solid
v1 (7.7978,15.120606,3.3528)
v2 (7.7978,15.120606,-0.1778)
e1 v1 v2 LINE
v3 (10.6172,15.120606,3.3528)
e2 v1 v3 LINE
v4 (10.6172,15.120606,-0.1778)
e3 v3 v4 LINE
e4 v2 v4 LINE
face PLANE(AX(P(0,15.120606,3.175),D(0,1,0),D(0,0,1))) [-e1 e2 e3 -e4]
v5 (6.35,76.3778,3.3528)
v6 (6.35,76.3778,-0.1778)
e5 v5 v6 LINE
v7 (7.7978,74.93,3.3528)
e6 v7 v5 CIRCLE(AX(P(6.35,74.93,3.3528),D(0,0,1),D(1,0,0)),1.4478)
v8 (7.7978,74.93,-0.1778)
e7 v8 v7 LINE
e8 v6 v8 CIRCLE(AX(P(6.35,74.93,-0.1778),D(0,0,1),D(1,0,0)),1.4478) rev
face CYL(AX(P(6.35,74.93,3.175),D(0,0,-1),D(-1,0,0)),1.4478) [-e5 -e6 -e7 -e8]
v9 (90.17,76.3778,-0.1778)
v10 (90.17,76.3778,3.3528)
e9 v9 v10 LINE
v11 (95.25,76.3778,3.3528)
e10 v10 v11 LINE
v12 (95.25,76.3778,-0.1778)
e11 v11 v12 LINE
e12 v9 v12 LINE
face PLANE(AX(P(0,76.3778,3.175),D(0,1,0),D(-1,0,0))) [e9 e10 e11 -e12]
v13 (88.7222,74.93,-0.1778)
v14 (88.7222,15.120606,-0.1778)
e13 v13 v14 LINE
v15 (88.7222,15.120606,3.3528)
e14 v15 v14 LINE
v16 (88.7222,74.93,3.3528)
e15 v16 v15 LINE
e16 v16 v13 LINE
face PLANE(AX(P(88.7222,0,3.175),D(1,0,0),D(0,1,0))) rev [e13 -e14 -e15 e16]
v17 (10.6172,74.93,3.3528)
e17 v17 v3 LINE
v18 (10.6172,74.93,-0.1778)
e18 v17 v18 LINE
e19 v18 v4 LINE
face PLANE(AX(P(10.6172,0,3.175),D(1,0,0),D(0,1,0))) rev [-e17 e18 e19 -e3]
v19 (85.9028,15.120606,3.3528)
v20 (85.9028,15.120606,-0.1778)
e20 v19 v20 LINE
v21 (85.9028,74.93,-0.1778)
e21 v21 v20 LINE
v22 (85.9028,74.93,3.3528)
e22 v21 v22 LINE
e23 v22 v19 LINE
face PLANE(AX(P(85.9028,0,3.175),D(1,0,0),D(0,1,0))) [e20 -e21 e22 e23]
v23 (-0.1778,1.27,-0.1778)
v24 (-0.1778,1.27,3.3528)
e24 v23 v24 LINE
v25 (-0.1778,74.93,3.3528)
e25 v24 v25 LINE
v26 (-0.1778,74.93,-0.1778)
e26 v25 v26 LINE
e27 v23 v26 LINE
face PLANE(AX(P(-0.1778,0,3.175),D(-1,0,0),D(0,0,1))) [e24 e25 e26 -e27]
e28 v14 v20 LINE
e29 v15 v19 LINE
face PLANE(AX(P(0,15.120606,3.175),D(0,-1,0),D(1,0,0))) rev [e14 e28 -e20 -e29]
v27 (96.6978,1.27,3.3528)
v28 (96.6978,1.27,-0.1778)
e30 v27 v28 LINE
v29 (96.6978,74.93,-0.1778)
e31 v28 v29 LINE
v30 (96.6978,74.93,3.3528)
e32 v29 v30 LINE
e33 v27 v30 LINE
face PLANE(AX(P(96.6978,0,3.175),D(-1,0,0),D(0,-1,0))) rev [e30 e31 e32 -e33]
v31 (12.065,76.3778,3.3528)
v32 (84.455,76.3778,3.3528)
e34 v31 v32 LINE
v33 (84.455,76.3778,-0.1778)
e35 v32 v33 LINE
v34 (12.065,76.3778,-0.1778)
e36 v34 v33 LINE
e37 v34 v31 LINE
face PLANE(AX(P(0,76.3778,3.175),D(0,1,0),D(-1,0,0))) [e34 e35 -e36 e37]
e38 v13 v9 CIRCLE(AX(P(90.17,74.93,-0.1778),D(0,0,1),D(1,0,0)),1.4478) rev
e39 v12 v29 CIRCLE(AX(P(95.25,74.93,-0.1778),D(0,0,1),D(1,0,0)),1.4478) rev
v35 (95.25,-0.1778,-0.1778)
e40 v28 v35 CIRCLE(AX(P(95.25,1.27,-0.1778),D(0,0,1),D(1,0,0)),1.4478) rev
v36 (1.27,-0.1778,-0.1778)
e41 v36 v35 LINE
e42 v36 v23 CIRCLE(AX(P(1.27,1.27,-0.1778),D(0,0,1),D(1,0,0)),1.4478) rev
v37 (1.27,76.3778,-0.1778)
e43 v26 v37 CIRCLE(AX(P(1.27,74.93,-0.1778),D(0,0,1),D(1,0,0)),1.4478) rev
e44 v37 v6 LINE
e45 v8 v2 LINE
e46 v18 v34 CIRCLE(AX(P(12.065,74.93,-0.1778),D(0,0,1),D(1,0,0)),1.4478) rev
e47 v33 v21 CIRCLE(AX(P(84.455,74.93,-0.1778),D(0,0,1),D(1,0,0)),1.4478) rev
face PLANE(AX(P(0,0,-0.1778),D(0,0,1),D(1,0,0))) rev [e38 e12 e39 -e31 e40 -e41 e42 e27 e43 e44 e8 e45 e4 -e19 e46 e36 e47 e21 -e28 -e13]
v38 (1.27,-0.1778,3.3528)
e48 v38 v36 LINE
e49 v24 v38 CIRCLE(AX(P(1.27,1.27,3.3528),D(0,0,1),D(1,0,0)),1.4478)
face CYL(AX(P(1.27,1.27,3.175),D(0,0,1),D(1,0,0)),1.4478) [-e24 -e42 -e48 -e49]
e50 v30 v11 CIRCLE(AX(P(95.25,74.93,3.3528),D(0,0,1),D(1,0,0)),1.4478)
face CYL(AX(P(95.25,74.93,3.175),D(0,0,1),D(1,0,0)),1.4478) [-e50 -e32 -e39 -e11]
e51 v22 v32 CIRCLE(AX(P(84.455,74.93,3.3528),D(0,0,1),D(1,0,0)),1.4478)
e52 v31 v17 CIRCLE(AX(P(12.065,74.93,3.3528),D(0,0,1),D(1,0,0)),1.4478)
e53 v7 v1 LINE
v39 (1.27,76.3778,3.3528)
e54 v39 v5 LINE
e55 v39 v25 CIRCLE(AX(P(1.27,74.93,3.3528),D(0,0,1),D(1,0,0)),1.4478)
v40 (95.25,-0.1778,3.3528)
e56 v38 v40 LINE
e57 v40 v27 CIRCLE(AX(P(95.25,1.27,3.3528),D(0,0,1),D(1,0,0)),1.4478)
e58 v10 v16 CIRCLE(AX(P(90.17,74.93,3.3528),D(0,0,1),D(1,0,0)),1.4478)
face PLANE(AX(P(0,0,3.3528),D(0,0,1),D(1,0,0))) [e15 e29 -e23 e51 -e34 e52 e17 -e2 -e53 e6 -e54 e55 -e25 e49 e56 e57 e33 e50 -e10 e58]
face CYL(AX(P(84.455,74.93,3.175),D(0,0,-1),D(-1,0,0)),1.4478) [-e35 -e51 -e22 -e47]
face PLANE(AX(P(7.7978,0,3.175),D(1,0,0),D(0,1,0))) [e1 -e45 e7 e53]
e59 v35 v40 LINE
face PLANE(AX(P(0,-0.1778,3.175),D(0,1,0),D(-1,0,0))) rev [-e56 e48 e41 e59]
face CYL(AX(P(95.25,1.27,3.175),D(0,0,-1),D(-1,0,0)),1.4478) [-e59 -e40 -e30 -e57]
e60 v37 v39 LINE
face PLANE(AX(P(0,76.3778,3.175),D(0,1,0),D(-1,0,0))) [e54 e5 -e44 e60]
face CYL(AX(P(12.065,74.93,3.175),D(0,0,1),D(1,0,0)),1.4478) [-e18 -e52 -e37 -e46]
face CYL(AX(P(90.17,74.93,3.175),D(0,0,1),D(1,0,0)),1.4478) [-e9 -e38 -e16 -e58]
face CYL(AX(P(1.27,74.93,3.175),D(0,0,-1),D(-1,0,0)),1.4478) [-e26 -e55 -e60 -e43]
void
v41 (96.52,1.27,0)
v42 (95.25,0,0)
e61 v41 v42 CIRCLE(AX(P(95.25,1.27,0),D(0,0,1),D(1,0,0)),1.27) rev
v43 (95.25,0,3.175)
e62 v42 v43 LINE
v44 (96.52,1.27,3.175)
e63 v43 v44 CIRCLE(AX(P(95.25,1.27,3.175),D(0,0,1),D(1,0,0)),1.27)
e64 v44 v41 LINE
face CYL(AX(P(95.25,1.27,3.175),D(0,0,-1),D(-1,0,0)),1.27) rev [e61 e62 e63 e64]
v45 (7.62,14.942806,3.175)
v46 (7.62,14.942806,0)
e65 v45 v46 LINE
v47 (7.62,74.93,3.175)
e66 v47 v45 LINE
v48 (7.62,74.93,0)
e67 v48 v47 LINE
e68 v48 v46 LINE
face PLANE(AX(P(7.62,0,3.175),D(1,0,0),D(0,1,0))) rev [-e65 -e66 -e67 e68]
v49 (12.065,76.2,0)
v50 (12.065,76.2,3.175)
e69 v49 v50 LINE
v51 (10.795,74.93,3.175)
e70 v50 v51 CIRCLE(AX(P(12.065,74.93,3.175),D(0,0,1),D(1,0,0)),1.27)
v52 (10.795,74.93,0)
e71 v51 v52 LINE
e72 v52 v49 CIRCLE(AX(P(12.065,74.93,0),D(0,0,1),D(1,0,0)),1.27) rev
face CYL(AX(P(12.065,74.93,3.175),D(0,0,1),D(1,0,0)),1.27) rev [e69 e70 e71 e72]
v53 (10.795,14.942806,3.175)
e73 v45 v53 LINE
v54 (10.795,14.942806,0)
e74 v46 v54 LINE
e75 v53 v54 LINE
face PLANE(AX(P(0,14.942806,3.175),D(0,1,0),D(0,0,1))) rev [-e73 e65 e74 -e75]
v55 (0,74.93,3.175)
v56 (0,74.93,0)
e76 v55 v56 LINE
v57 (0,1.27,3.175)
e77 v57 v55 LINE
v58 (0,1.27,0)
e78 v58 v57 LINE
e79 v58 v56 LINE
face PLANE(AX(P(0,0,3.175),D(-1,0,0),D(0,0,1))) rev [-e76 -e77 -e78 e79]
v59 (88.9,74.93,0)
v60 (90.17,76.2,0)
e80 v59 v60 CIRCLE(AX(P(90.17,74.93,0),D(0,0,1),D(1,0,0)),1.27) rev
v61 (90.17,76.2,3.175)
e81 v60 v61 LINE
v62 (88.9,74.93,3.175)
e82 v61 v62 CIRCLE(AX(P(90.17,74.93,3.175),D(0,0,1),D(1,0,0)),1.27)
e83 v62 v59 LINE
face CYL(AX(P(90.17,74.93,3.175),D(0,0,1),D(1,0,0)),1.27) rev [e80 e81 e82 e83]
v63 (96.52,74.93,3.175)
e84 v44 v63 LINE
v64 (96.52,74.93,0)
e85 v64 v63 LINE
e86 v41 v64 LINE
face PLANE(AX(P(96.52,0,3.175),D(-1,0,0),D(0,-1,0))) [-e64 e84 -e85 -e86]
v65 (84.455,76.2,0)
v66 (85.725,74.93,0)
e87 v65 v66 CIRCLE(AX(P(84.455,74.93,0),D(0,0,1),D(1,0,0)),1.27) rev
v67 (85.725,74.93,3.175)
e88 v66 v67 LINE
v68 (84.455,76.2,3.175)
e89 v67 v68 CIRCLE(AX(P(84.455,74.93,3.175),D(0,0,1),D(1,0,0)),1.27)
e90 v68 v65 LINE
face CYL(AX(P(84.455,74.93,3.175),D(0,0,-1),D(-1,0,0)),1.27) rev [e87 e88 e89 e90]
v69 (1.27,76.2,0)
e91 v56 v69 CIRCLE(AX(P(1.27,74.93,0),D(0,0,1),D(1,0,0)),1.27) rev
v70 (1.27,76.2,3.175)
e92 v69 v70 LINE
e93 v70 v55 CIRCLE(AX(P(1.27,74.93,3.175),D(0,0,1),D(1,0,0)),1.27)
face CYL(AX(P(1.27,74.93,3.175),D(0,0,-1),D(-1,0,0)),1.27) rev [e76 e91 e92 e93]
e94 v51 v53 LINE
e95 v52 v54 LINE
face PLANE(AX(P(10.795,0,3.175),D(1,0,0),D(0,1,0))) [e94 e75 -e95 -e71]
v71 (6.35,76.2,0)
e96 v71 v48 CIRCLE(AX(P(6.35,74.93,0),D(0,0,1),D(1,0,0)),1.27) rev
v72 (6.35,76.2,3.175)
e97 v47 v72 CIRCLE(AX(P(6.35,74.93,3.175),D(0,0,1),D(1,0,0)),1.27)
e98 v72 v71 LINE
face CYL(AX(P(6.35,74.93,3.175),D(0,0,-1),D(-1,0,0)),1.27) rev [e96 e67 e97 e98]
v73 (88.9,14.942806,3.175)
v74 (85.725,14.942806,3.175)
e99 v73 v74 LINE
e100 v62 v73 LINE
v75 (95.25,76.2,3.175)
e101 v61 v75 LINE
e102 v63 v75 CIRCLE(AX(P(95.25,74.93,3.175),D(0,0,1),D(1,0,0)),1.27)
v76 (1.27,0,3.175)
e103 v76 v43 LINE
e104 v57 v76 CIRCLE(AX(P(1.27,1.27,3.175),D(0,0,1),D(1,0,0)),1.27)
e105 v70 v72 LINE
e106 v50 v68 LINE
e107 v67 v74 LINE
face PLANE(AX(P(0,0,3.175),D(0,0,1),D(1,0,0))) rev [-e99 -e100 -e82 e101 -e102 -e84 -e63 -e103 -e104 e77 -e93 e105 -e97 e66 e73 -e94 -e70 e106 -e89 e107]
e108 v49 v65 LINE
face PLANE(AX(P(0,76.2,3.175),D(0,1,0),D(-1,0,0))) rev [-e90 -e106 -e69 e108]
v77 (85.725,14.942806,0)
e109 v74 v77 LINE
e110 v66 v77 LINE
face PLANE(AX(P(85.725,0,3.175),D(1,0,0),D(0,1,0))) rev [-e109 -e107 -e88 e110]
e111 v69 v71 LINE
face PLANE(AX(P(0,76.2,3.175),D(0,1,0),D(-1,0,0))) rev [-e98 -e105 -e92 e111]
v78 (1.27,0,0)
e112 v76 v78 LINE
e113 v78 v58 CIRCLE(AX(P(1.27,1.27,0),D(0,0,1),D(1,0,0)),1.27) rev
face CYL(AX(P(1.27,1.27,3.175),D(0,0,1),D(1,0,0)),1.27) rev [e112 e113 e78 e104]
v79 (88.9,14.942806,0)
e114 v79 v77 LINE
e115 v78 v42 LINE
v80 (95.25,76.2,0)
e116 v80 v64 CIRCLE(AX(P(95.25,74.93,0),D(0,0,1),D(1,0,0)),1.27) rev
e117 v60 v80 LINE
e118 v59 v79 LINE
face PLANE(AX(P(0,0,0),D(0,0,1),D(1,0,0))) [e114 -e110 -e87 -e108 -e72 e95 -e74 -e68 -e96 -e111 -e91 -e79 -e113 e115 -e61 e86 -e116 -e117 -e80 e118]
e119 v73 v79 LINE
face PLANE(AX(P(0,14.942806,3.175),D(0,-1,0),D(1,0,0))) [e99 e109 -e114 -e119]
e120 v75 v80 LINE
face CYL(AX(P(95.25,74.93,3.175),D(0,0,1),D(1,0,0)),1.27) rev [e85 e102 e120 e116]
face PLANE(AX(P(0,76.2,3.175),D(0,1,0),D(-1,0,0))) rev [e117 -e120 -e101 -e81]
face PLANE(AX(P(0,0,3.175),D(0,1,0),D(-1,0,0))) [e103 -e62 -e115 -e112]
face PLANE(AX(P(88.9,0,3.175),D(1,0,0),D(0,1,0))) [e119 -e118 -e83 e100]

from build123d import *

# Parameters (mm, degrees)
BOSS_EXTRUDE1_DEPTH = 3.175
FILLET1_R           = 1.27
SHELL1_START        = -0.1778
SHELL1_OUTLINE_W    = 80.9244
SHELL1_OUTLINE_H    = 3.5306
SHELL1_DEPTH        = 0.1778
SHELL1_START_2      = 14.942805851
SHELL1_2_OUTLINE_W  = 2.8194
SHELL1_2_OUTLINE_H  = 3.5306
SHELL1_2_DEPTH      = 0.1778
SHELL1_3_DEPTH      = 3.175
SHELL1_4_DEPTH      = 0.1778
SHELL1_START_3      = 3.175
SHELL1_5_DEPTH      = 0.1778
SHELL1_6_DEPTH      = 3.5306


with BuildPart() as part:
    # Sketch1 → Boss-Extrude1 (new body)
    with BuildSketch(Plane.XY):
        Polygon((48.26, 0), (48.26, 76.2), (10.795, 76.2), (10.795, 14.942805851), (7.62, 14.942805851), (7.62, 76.2), (0, 76.2), (0, 0), align=None)
        Polygon((85.725, 76.2), (48.26, 76.2), (48.26, 0), (96.52, 0), (96.52, 76.2), (88.9, 76.2), (88.9, 14.942805851), (85.725, 14.942805851), align=None)
    extrude(amount=BOSS_EXTRUDE1_DEPTH)

    # Fillet1
    fillet1_edges = [part.edges().sort_by_distance(p)[0] for p in [
        (0, 0, 1.5875),
        (0, 76.2, 1.5875),
        (7.62, 76.2, 1.5875),
        (10.795, 76.2, 1.5875),
        (85.725, 76.2, 1.5875),
        (88.9, 76.2, 1.5875),
        (96.52, 76.2, 1.5875),
        (96.52, 0, 1.5875),
    ]]
    fillet(fillet1_edges, radius=FILLET1_R)

    # Shell1: read off the stored shape, not the designer's step
    # Shell1 outline → Shell1 (add)
    with BuildSketch(Plane(origin=(0, 0, 0), x_dir=(1, 0, 0), z_dir=(0, 1, 0)).offset(SHELL1_START)):
        with Locations((48.26, -1.5875)):
            Rectangle(SHELL1_OUTLINE_W, SHELL1_OUTLINE_H)
    extrude(amount=SHELL1_DEPTH)

    # Shell1 2 outline → Shell1 2 (add)
    with BuildSketch(Plane(origin=(0, 0, 0), x_dir=(1, 0, 0), z_dir=(0, 1, 0)).offset(SHELL1_START_2)):
        with Locations((87.3125, -1.5875)):
            Rectangle(SHELL1_2_OUTLINE_W, SHELL1_2_OUTLINE_H)
        with Locations((9.2075, -1.5875)):
            Rectangle(SHELL1_2_OUTLINE_W, SHELL1_2_OUTLINE_H)
    extrude(amount=SHELL1_2_DEPTH)

    # Shell1 3 outline → Shell1 3 (cut)
    with BuildSketch(Plane.XY):
        with BuildLine():
            Line((1.27, 0), (95.25, 0))
            ThreePointArc((95.25, 0), (96.148025612, 0.371974388), (96.52, 1.27))
            Line((96.52, 1.27), (96.52, 74.93))
            ThreePointArc((96.52, 74.93), (96.148025612, 75.828025612), (95.25, 76.2))
            Line((95.25, 76.2), (90.17, 76.2))
            ThreePointArc((90.17, 76.2), (89.271974388, 75.828025612), (88.9, 74.93))
            Line((88.9, 74.93), (88.9, 14.942805851))
            Line((88.9, 14.942805851), (85.725, 14.942805851))
            Line((85.725, 14.942805851), (85.725, 74.93))
            ThreePointArc((85.725, 74.93), (85.353025612, 75.828025612), (84.455, 76.2))
            Line((84.455, 76.2), (12.065, 76.2))
            ThreePointArc((12.065, 76.2), (11.166974388, 75.828025612), (10.795, 74.93))
            Line((10.795, 74.93), (10.795, 14.942805851))
            Line((10.795, 14.942805851), (7.62, 14.942805851))
            Line((7.62, 14.942805851), (7.62, 74.93))
            ThreePointArc((7.62, 74.93), (7.248025612, 75.828025612), (6.35, 76.2))
            Line((6.35, 76.2), (1.27, 76.2))
            ThreePointArc((1.27, 76.2), (0.371974388, 75.828025612), (0, 74.93))
            Line((0, 74.93), (0, 1.27))
            ThreePointArc((0, 1.27), (0.371974388, 0.371974388), (1.27, 0))
        make_face()
    extrude(amount=SHELL1_3_DEPTH, mode=Mode.SUBTRACT)

    # Shell1 4 outline → Shell1 4 (add)
    with BuildSketch(Plane.XY.offset(SHELL1_START)):
        with BuildLine():
            Line((96.6978, 1.27), (96.6978, 74.93))
            ThreePointArc((96.6978, 74.93), (96.273749198, 75.953749198), (95.25, 76.3778))
            Line((95.25, 76.3778), (90.17, 76.3778))
            ThreePointArc((90.17, 76.3778), (89.146250802, 75.953749198), (88.7222, 74.93))
            Line((88.7222, 74.93), (88.7222, 14.942805851))
            Line((88.7222, 14.942805851), (85.9028, 14.942805851))
            Line((85.9028, 14.942805851), (85.9028, 74.93))
            ThreePointArc((85.9028, 74.93), (85.478749198, 75.953749198), (84.455, 76.3778))
            Line((84.455, 76.3778), (12.065, 76.3778))
            ThreePointArc((12.065, 76.3778), (11.041250802, 75.953749198), (10.6172, 74.93))
            Line((10.6172, 74.93), (10.6172, 14.942805851))
            Line((10.6172, 14.942805851), (7.7978, 14.942805851))
            Line((7.7978, 14.942805851), (7.7978, 74.93))
            ThreePointArc((7.7978, 74.93), (7.373749198, 75.953749198), (6.35, 76.3778))
            Line((6.35, 76.3778), (1.27, 76.3778))
            ThreePointArc((1.27, 76.3778), (0.246250802, 75.953749198), (-0.1778, 74.93))
            Line((-0.1778, 74.93), (-0.1778, 1.27))
            ThreePointArc((-0.1778, 1.27), (0.246250802, 0.246250802), (1.27, -0.1778))
            Line((1.27, -0.1778), (7.7978, -0.1778))
            Line((7.7978, -0.1778), (7.7978, 0))
            Line((7.7978, 0), (88.7222, 0))
            Line((88.7222, 0), (88.7222, -0.1778))
            Line((88.7222, -0.1778), (95.25, -0.1778))
            ThreePointArc((95.25, -0.1778), (96.273749198, 0.246250802), (96.6978, 1.27))
        make_face()
    extrude(amount=SHELL1_4_DEPTH)

    # Shell1 5 outline → Shell1 5 (add)
    with BuildSketch(Plane.XY.offset(SHELL1_START_3)):
        with BuildLine():
            Line((96.6978, 1.27), (96.6978, 74.93))
            ThreePointArc((96.6978, 74.93), (96.273749198, 75.953749198), (95.25, 76.3778))
            Line((95.25, 76.3778), (90.17, 76.3778))
            ThreePointArc((90.17, 76.3778), (89.146250802, 75.953749198), (88.7222, 74.93))
            Line((88.7222, 74.93), (88.7222, 14.942805851))
            Line((88.7222, 14.942805851), (85.9028, 14.942805851))
            Line((85.9028, 14.942805851), (85.9028, 74.93))
            ThreePointArc((85.9028, 74.93), (85.478749198, 75.953749198), (84.455, 76.3778))
            Line((84.455, 76.3778), (12.065, 76.3778))
            ThreePointArc((12.065, 76.3778), (11.041250802, 75.953749198), (10.6172, 74.93))
            Line((10.6172, 74.93), (10.6172, 14.942805851))
            Line((10.6172, 14.942805851), (7.7978, 14.942805851))
            Line((7.7978, 14.942805851), (7.7978, 74.93))
            ThreePointArc((7.7978, 74.93), (7.373749198, 75.953749198), (6.35, 76.3778))
            Line((6.35, 76.3778), (1.27, 76.3778))
            ThreePointArc((1.27, 76.3778), (0.246250802, 75.953749198), (-0.1778, 74.93))
            Line((-0.1778, 74.93), (-0.1778, 1.27))
            ThreePointArc((-0.1778, 1.27), (0.246250802, 0.246250802), (1.27, -0.1778))
            Line((1.27, -0.1778), (7.7978, -0.1778))
            Line((7.7978, -0.1778), (7.7978, 0))
            Line((7.7978, 0), (88.7222, 0))
            Line((88.7222, 0), (88.7222, -0.1778))
            Line((88.7222, -0.1778), (95.25, -0.1778))
            ThreePointArc((95.25, -0.1778), (96.273749198, 0.246250802), (96.6978, 1.27))
        make_face()
    extrude(amount=SHELL1_5_DEPTH)

    # Shell1 6 outline → Shell1 6 (add)
    with BuildSketch(Plane.XY.offset(SHELL1_START)):
        with BuildLine():
            Line((96.6978, 1.27), (96.6978, 74.93))
            ThreePointArc((96.6978, 74.93), (96.273749198, 75.953749198), (95.25, 76.3778))
            Line((95.25, 76.3778), (90.17, 76.3778))
            ThreePointArc((90.17, 76.3778), (89.146250802, 75.953749198), (88.7222, 74.93))
            Line((88.7222, 74.93), (88.7222, 14.942805851))
            Line((88.7222, 14.942805851), (88.9, 14.942805851))
            Line((88.9, 14.942805851), (88.9, 74.93))
            ThreePointArc((88.9, 74.93), (89.271974388, 75.828025612), (90.17, 76.2))
            Line((90.17, 76.2), (95.25, 76.2))
            ThreePointArc((95.25, 76.2), (96.148025612, 75.828025612), (96.52, 74.93))
            Line((96.52, 74.93), (96.52, 1.27))
            ThreePointArc((96.52, 1.27), (96.148025612, 0.371974388), (95.25, 0))
            Line((95.25, 0), (88.7222, 0))
            Line((88.7222, 0), (88.7222, -0.1778))
            Line((88.7222, -0.1778), (95.25, -0.1778))
            ThreePointArc((95.25, -0.1778), (96.273749198, 0.246250802), (96.6978, 1.27))
        make_face()
        with BuildLine():
            Line((1.27, -0.1778), (7.7978, -0.1778))
            Line((7.7978, -0.1778), (7.7978, 0))
            Line((7.7978, 0), (1.27, 0))
            ThreePointArc((1.27, 0), (0.371974388, 0.371974388), (0, 1.27))
            Line((0, 1.27), (0, 74.93))
            ThreePointArc((0, 74.93), (0.371974388, 75.828025612), (1.27, 76.2))
            Line((1.27, 76.2), (6.35, 76.2))
            ThreePointArc((6.35, 76.2), (7.248025612, 75.828025612), (7.62, 74.93))
            Line((7.62, 74.93), (7.62, 14.942805851))
            Line((7.62, 14.942805851), (7.7978, 14.942805851))
            Line((7.7978, 14.942805851), (7.7978, 74.93))
            ThreePointArc((7.7978, 74.93), (7.373749198, 75.953749198), (6.35, 76.3778))
            Line((6.35, 76.3778), (1.27, 76.3778))
            ThreePointArc((1.27, 76.3778), (0.246250802, 75.953749198), (-0.1778, 74.93))
            Line((-0.1778, 74.93), (-0.1778, 1.27))
            ThreePointArc((-0.1778, 1.27), (0.246250802, 0.246250802), (1.27, -0.1778))
        make_face()
        with BuildLine():
            Line((85.725, 14.942805851), (85.9028, 14.942805851))
            Line((85.9028, 14.942805851), (85.9028, 74.93))
            ThreePointArc((85.9028, 74.93), (85.478749198, 75.953749198), (84.455, 76.3778))
            Line((84.455, 76.3778), (12.065, 76.3778))
            ThreePointArc((12.065, 76.3778), (11.041250802, 75.953749198), (10.6172, 74.93))
            Line((10.6172, 74.93), (10.6172, 14.942805851))
            Line((10.6172, 14.942805851), (10.795, 14.942805851))
            Line((10.795, 14.942805851), (10.795, 74.93))
            ThreePointArc((10.795, 74.93), (11.166974388, 75.828025612), (12.065, 76.2))
            Line((12.065, 76.2), (84.455, 76.2))
            ThreePointArc((84.455, 76.2), (85.353025612, 75.828025612), (85.725, 74.93))
            Line((85.725, 74.93), (85.725, 14.942805851))
        make_face()
    extrude(amount=SHELL1_6_DEPTH)


solid = part.part
